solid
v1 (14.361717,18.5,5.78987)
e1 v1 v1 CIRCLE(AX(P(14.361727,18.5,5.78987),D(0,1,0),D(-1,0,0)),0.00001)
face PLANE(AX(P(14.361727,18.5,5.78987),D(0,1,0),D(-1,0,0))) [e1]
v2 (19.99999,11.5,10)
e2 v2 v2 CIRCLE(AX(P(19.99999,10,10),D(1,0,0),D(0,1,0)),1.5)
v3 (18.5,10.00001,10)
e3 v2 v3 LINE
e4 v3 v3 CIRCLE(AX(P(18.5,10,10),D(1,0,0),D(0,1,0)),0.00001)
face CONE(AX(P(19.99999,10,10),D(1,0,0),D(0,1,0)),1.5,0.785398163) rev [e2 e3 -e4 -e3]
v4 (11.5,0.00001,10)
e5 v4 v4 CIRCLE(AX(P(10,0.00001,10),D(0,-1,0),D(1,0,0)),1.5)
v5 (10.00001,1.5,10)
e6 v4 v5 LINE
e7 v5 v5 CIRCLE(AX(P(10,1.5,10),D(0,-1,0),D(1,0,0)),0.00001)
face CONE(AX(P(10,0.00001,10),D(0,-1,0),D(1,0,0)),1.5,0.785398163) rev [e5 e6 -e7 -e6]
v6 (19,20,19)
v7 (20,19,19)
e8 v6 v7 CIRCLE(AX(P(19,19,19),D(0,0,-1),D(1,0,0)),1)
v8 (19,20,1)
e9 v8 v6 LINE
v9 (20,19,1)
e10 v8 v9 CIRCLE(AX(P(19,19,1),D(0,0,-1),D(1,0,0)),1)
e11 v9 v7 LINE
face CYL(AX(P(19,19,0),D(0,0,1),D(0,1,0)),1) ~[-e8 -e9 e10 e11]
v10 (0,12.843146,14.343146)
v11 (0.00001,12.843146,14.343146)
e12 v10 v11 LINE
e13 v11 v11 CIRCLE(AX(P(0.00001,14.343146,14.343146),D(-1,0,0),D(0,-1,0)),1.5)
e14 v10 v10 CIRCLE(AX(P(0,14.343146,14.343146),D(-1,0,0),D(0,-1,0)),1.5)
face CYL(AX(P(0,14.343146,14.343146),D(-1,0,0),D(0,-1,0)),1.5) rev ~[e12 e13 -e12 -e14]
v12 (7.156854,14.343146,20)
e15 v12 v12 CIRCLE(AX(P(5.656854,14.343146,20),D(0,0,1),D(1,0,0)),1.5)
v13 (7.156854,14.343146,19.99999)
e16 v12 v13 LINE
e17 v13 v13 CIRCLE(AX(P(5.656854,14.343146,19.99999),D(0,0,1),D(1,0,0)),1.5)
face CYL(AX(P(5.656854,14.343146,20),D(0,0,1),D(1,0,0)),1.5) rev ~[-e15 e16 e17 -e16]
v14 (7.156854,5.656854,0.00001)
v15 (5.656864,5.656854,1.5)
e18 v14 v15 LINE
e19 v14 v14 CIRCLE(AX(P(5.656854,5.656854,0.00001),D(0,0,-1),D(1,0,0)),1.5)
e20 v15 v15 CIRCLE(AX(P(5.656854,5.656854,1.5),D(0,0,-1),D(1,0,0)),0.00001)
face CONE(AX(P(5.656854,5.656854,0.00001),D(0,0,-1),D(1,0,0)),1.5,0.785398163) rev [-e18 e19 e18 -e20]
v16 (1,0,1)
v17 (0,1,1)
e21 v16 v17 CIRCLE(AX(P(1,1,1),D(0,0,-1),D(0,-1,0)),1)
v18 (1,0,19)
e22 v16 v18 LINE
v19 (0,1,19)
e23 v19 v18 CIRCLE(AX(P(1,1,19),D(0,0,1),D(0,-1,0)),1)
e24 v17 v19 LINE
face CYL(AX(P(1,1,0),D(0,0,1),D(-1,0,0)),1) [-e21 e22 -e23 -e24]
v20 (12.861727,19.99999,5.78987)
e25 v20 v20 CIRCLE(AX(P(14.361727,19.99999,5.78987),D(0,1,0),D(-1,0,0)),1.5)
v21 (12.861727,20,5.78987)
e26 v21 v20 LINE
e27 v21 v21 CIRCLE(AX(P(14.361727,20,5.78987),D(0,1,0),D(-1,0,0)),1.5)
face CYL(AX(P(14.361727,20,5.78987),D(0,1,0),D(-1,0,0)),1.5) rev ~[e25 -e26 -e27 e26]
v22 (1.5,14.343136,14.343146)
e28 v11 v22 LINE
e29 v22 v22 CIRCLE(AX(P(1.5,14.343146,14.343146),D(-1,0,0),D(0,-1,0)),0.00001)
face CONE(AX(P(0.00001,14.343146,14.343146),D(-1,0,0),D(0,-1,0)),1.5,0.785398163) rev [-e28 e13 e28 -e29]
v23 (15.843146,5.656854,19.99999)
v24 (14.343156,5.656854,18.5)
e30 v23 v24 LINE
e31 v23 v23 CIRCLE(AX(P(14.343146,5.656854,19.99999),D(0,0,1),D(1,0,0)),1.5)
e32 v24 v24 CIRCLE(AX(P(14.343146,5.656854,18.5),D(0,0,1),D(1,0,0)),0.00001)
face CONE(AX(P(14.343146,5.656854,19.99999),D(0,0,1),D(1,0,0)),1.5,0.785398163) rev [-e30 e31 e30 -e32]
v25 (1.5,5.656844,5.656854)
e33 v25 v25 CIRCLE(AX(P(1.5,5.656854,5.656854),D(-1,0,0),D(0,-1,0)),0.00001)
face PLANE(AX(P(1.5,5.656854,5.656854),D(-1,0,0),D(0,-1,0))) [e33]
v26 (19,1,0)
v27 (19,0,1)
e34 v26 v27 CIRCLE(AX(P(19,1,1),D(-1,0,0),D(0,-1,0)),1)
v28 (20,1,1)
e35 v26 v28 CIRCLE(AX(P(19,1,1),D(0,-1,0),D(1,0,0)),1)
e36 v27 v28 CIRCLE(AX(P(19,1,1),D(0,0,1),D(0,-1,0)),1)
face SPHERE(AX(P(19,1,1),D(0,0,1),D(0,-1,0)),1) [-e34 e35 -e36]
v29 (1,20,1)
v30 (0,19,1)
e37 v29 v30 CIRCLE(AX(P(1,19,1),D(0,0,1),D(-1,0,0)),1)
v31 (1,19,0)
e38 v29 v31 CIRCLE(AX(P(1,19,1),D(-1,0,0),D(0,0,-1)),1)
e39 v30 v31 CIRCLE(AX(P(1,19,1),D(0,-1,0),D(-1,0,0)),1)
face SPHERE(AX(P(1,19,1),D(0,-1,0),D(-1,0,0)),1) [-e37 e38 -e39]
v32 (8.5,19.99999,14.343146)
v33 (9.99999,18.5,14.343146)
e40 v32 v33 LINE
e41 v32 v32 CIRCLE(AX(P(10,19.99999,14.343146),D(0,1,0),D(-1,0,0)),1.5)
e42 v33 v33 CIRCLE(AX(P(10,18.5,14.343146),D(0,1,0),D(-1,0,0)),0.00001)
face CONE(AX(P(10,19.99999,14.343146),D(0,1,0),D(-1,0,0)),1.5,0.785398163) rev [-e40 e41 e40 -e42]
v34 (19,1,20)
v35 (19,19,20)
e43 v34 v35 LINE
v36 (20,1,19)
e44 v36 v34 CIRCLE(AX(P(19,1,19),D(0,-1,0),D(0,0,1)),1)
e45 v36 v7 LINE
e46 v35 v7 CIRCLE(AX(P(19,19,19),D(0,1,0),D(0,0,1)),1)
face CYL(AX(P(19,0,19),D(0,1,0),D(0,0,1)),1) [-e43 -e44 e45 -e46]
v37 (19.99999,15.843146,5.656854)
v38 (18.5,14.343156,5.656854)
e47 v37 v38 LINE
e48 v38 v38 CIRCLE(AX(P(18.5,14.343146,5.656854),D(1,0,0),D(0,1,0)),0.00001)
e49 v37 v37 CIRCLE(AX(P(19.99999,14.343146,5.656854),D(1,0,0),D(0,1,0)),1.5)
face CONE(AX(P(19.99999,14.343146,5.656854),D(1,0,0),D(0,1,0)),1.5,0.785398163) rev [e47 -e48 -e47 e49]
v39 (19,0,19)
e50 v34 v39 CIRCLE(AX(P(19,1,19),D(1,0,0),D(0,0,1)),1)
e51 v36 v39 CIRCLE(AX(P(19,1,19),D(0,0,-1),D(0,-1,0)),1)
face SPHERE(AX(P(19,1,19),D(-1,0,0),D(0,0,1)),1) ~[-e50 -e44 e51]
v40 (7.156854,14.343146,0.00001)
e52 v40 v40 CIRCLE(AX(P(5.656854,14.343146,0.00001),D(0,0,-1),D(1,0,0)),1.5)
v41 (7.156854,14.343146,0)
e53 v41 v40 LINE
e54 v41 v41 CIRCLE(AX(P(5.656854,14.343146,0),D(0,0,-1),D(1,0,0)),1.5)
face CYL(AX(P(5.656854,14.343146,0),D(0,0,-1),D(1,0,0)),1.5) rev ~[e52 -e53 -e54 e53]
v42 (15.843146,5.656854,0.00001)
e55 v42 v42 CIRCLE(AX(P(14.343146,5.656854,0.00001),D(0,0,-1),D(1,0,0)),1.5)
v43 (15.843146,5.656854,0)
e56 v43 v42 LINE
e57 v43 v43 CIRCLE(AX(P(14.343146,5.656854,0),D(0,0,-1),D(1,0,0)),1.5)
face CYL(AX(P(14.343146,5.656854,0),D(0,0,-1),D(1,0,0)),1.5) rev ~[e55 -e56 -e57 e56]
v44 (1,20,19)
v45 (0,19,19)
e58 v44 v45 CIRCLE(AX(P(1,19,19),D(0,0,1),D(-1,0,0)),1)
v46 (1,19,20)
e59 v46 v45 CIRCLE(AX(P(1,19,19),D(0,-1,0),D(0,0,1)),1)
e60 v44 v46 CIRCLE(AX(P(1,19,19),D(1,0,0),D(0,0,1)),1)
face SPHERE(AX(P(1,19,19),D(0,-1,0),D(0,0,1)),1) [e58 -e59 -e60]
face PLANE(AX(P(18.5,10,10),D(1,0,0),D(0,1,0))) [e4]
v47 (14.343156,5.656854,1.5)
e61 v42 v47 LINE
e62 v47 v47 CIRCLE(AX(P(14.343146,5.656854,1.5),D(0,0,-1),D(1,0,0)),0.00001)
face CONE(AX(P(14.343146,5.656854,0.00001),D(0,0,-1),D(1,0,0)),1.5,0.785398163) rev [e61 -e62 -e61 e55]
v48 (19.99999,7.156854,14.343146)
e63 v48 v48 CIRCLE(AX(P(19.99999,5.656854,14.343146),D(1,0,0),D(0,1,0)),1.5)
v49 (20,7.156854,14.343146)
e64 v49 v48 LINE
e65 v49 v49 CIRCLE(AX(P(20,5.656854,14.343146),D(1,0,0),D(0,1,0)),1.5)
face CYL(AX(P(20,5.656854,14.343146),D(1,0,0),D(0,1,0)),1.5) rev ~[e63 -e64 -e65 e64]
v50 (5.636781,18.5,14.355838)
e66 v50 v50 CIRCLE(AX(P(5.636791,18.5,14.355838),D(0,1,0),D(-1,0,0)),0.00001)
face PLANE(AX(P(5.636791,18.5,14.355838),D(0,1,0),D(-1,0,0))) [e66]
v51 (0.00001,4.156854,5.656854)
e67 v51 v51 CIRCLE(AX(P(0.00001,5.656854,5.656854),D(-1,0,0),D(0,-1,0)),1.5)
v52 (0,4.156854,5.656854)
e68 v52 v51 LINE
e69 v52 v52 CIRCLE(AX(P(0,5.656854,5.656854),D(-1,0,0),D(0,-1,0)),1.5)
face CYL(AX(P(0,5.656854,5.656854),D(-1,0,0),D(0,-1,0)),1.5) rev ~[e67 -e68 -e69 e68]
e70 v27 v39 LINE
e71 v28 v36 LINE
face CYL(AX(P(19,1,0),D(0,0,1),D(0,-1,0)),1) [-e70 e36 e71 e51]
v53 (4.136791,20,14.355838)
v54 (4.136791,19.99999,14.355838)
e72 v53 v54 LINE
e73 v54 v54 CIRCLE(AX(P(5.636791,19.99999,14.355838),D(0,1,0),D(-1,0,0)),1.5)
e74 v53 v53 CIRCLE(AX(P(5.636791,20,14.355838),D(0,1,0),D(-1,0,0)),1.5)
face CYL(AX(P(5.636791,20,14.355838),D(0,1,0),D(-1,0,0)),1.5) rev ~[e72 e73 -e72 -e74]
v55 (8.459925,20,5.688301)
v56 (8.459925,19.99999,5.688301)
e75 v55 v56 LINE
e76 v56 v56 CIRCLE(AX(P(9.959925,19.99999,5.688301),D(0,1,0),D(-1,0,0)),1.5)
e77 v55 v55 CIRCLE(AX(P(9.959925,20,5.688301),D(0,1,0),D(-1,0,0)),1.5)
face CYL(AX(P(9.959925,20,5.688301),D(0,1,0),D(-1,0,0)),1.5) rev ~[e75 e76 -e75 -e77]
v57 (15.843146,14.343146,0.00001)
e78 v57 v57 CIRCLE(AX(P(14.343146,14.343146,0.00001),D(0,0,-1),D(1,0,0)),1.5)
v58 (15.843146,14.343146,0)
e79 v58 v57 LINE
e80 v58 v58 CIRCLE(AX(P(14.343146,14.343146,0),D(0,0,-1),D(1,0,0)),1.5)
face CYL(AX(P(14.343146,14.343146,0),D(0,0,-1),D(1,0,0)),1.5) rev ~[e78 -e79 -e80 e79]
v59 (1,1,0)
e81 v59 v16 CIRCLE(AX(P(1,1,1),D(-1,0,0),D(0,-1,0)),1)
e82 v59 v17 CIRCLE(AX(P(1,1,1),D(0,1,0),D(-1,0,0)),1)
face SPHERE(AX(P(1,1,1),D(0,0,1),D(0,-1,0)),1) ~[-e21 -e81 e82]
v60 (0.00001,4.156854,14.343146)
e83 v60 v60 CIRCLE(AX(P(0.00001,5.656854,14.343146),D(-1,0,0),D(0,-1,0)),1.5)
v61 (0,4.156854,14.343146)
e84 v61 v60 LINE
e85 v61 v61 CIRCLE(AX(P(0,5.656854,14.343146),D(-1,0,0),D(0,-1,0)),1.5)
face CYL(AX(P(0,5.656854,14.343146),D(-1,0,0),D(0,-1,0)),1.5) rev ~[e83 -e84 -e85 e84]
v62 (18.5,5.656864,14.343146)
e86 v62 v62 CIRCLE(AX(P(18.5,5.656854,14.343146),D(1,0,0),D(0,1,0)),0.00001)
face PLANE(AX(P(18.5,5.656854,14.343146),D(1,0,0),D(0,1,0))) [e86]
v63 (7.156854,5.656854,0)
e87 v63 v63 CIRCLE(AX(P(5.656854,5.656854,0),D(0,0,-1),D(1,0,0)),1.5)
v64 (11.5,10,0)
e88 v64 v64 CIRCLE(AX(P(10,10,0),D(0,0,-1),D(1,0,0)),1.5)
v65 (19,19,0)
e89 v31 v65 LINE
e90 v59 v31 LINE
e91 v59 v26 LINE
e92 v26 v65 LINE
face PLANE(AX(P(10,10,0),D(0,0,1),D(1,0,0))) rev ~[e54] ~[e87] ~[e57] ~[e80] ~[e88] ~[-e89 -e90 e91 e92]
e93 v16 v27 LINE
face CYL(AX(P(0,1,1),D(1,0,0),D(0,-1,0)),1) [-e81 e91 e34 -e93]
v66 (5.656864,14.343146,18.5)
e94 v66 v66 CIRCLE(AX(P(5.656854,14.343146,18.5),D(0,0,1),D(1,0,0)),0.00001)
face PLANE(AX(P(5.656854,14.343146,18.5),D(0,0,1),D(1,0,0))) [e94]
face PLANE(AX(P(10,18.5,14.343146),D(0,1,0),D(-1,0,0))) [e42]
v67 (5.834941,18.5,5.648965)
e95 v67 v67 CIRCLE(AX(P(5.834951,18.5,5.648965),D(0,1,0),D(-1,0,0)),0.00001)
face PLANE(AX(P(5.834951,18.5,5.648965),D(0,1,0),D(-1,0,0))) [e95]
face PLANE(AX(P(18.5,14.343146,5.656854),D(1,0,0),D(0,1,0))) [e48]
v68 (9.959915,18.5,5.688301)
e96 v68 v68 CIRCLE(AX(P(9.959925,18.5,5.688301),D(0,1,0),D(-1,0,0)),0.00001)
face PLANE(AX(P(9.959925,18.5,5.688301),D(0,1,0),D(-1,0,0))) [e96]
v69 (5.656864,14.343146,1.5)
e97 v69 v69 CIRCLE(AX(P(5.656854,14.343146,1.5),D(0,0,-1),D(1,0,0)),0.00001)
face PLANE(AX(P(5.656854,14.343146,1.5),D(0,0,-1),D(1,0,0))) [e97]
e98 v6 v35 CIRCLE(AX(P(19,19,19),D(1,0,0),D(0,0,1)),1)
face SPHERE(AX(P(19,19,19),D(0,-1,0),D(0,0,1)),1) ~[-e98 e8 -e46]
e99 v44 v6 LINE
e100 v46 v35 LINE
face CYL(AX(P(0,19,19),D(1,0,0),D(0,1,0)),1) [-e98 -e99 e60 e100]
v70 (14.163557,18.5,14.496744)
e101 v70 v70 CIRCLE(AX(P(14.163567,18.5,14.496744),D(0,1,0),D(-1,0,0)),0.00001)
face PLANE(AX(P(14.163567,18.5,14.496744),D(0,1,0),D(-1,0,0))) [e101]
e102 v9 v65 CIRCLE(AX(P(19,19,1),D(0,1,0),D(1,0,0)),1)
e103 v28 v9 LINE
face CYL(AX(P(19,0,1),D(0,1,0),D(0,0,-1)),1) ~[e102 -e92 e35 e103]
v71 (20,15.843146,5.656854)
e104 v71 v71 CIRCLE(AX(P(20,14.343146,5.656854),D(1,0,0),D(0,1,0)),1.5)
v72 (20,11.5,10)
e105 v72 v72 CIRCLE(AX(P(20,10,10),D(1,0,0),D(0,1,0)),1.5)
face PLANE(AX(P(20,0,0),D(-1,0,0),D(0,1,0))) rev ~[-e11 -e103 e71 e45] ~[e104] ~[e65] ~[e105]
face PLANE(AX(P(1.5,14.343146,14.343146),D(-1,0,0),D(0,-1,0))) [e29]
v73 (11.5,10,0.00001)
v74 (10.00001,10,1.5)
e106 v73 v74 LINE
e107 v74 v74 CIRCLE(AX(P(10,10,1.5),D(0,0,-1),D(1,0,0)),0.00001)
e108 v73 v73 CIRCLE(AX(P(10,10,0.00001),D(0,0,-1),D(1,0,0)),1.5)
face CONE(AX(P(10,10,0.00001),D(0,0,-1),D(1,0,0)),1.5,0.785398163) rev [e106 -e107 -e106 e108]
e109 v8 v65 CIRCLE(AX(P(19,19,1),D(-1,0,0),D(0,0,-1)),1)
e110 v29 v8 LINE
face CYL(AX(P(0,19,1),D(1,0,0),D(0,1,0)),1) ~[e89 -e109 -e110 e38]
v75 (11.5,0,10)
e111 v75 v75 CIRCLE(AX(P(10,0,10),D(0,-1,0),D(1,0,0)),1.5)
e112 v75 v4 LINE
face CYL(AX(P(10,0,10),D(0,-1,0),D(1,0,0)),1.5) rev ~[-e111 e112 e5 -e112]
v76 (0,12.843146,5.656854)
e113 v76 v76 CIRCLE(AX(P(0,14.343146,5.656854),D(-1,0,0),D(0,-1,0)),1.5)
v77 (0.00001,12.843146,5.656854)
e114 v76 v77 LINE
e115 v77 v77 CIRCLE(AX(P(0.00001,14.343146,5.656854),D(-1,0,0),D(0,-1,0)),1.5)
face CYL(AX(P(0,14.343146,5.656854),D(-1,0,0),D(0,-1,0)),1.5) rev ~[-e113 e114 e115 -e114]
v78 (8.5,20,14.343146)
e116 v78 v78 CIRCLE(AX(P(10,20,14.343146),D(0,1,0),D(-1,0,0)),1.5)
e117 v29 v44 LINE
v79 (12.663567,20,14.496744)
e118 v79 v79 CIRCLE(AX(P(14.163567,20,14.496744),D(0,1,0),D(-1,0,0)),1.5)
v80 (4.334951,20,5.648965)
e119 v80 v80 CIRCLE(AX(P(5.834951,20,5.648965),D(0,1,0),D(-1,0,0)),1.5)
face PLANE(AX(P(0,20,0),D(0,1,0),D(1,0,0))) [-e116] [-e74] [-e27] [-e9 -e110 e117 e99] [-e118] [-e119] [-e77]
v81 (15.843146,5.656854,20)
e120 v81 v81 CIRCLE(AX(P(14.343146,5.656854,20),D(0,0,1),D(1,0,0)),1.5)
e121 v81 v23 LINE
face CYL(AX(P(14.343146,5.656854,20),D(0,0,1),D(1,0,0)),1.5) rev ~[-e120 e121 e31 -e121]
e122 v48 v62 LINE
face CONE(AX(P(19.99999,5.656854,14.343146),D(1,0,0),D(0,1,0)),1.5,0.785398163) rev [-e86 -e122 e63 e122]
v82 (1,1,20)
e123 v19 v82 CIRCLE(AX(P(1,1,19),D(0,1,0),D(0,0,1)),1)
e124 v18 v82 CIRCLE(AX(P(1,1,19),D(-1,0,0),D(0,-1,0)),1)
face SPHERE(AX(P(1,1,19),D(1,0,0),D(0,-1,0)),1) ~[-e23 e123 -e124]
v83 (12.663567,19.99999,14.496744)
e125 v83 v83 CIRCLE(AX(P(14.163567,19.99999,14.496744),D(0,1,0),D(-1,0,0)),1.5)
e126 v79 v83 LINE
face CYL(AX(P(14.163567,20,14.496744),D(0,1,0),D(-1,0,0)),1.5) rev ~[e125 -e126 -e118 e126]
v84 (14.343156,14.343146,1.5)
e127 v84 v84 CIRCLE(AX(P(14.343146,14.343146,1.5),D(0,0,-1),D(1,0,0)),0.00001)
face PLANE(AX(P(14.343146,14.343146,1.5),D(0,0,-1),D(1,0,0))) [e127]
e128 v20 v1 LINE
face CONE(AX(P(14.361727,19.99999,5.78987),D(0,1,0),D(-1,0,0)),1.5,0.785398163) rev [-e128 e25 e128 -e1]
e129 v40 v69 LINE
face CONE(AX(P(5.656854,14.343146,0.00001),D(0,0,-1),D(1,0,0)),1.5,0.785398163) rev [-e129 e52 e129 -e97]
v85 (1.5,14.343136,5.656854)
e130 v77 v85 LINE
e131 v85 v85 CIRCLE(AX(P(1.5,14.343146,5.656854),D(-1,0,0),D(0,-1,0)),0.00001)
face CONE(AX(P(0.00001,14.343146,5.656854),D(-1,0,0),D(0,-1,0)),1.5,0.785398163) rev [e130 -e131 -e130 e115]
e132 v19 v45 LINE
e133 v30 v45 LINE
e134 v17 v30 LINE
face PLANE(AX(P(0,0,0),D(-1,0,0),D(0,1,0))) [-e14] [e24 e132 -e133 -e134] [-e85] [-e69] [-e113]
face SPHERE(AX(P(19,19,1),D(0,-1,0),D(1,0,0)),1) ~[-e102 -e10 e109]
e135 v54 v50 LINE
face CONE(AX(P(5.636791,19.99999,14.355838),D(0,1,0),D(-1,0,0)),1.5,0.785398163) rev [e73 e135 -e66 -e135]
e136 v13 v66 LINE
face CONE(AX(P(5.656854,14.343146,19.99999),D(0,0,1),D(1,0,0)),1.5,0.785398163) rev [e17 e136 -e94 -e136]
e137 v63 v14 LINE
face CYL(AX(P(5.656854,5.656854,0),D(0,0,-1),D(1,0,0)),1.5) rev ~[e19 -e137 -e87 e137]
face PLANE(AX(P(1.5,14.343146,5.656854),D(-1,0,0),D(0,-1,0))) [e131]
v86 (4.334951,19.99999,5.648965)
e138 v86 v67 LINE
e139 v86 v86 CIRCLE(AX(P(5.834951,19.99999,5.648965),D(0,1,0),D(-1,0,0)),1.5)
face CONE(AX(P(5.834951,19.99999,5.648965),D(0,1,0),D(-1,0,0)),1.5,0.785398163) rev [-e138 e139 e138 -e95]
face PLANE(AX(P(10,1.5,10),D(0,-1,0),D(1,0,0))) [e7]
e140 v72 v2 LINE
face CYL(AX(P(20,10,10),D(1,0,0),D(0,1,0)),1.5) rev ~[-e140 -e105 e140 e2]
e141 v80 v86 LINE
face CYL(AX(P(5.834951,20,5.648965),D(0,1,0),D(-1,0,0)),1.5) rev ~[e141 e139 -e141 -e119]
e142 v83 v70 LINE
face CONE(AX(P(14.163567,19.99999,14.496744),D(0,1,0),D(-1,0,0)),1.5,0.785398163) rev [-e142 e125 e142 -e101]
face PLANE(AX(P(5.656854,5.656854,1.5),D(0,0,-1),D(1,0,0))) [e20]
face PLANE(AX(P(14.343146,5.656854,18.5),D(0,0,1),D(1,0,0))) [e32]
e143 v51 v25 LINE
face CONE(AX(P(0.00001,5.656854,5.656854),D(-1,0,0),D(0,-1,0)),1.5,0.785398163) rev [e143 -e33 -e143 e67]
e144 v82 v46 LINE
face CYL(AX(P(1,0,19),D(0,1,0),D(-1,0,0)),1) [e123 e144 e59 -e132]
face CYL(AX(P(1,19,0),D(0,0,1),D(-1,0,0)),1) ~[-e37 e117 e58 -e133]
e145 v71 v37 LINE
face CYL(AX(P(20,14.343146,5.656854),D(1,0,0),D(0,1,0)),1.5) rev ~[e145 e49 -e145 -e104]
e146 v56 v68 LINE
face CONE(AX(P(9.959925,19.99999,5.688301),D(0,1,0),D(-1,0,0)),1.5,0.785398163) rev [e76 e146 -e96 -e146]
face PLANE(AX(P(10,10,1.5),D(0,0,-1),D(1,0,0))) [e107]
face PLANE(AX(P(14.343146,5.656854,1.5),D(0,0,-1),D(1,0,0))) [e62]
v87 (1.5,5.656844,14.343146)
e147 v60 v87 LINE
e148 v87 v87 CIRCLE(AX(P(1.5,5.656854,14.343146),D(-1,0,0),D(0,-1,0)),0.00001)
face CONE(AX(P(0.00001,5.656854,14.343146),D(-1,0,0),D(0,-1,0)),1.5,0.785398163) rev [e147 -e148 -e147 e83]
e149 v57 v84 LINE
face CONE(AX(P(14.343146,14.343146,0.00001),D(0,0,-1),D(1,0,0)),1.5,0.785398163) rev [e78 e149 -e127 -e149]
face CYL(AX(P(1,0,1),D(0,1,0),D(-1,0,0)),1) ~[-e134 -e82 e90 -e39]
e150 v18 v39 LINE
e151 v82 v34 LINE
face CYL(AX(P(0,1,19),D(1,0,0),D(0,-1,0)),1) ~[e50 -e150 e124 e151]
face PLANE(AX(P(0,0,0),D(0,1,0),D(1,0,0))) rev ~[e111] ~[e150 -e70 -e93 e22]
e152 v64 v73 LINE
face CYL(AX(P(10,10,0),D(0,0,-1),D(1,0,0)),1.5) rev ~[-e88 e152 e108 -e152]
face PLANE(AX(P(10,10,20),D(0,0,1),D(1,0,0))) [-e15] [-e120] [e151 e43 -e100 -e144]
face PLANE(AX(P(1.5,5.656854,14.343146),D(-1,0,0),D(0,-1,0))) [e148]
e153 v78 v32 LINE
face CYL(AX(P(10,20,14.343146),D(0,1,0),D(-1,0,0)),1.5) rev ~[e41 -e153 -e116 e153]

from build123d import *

# Parameters (mm, degrees)
F0_W      = 20
F0_H      = 20
F1_DEPTH  = 20
F2_R      = 1.5
F3_DEPTH  = 1.5
F4_R      = 1
F5_R      = 1.5
F6_DEPTH  = 1.5
F7_R      = 1.5
F8_DEPTH  = 1.5
F9_R      = 1.5
F10_DEPTH = 1.5
F11_R     = 1.5
F12_DEPTH = 1.5
F13_R     = 1.5
F14_DEPTH = 1.5
F15_SIZE  = 1.49999


# Not quite as in the source:
# - a fillet or chamfer is up to 0.001 mm smaller than in the source, because OpenCascade refuses the exact size


with BuildPart() as f1:
    # F0 (on Top) → F1 (new body)
    with BuildSketch(Plane.XY):
        with Locations((10, 10)):
            Rectangle(F0_W, F0_H)
    extrude(amount=F1_DEPTH)

    # F2 (on face) → F3 (cut)
    with BuildSketch(Plane.XZ):
        with Locations((10, 10)):
            Circle(F2_R)
    extrude(amount=-F3_DEPTH, mode=Mode.SUBTRACT)

    # F4
    f4_edges = [f1.edges().sort_by_distance(p)[0] for p in [
        (10, 0, 20),
        (20, 10, 20),
        (20, 0, 10),
        (0, 0, 10),
        (10, 0, 0),
        (20, 10, 0),
        (0, 10, 20),
        (10, 20, 20),
        (0, 10, 0),
        (0, 20, 10),
        (20, 20, 10),
        (10, 20, 0),
    ]]
    fillet(f4_edges, radius=F4_R)

    # F5 (on face) → F6 (cut)
    with BuildSketch(Plane.XY.offset(20)):
        with Locations((5.6568542495, 14.3431457505)):
            Circle(F5_R)
        with Locations((14.3431457505, 5.6568542495)):
            Circle(F5_R)
    extrude(amount=-F6_DEPTH, mode=Mode.SUBTRACT)

    # F7 (on face) → F8 (cut)
    with BuildSketch(Plane.YZ.offset(20)):
        with Locations((5.6568542495, 14.3431457505)):
            Circle(F7_R)
        with Locations((10, 10)):
            Circle(F7_R)
        with Locations((14.3431457505, 5.6568542495)):
            Circle(F7_R)
    extrude(amount=-F8_DEPTH, mode=Mode.SUBTRACT)

    # F9 (on face) → F10 (cut)
    with BuildSketch(Plane(origin=(0, 0, 0), x_dir=(0, -1, 0), z_dir=(-1, 0, 0))):
        with Locations((-14.3431457505, 14.3431457505)):
            Circle(F9_R)
        with Locations((-5.6568542495, 14.3431457505)):
            Circle(F9_R)
        with Locations((-14.3431457505, 5.6568542495)):
            Circle(F9_R)
        with Locations((-5.6568542495, 5.6568542495)):
            Circle(F9_R)
    extrude(amount=-F10_DEPTH, mode=Mode.SUBTRACT)

    # F11 (on face) → F12 (cut)
    with BuildSketch(Plane(origin=(0, 0, 0), x_dir=(1, 0, 0), z_dir=(0, 0, -1))):
        with Locations((5.6568542495, -5.6568542495)):
            Circle(F11_R)
        with Locations((10, -10)):
            Circle(F11_R)
        with Locations((14.3431457505, -5.6568542495)):
            Circle(F11_R)
        with Locations((5.6568542495, -14.3431457505)):
            Circle(F11_R)
        with Locations((14.3431457505, -14.3431457505)):
            Circle(F11_R)
    extrude(amount=-F12_DEPTH, mode=Mode.SUBTRACT)

    # F13 (on face) → F14 (cut)
    with BuildSketch(Plane(origin=(0, 20, 0), x_dir=(-1, 0, 0), z_dir=(0, 1, 0))):
        with Locations((-5.6367907673, 14.3558382988)):
            Circle(F13_R)
        with Locations((-10, 14.3431457505)):
            Circle(F13_R)
        with Locations((-14.1635667533, 14.496743679)):
            Circle(F13_R)
        with Locations((-14.3617270514, 5.7898699306)):
            Circle(F13_R)
        with Locations((-9.9599251616, 5.6883007245)):
            Circle(F13_R)
        with Locations((-5.8349510655, 5.6489654817)):
            Circle(F13_R)
    extrude(amount=-F14_DEPTH, mode=Mode.SUBTRACT)

    # F15 (size 1.5 in the source; OpenCascade refuses exactly that, so slightly less here)
    f15_edges = [f1.edges().sort_by_distance(p)[0] for p in [
        (8.5, 1.5, 10),
        (4.156854, 14.343146, 18.5),
        (12.843146, 5.656854, 18.5),
        (18.5, 4.156854, 14.343146),
        (18.5, 8.5, 10),
        (18.5, 12.843146, 5.656854),
        (1.5, 15.843146, 5.656854),
        (1.5, 15.843146, 14.343146),
        (1.5, 7.156854, 14.343146),
        (1.5, 7.156854, 5.656854),
        (4.156854, 5.656854, 1.5),
        (12.843146, 5.656854, 1.5),
        (8.5, 10, 1.5),
        (4.156854, 14.343146, 1.5),
        (12.843146, 14.343146, 1.5),
        (7.136791, 18.5, 14.355838),
        (11.5, 18.5, 14.343146),
        (15.663567, 18.5, 14.496744),
        (15.861727, 18.5, 5.78987),
        (11.459925, 18.5, 5.688301),
        (7.334951, 18.5, 5.648965),
    ]]
    chamfer(f15_edges, length=F15_SIZE)


solid = f1.part
